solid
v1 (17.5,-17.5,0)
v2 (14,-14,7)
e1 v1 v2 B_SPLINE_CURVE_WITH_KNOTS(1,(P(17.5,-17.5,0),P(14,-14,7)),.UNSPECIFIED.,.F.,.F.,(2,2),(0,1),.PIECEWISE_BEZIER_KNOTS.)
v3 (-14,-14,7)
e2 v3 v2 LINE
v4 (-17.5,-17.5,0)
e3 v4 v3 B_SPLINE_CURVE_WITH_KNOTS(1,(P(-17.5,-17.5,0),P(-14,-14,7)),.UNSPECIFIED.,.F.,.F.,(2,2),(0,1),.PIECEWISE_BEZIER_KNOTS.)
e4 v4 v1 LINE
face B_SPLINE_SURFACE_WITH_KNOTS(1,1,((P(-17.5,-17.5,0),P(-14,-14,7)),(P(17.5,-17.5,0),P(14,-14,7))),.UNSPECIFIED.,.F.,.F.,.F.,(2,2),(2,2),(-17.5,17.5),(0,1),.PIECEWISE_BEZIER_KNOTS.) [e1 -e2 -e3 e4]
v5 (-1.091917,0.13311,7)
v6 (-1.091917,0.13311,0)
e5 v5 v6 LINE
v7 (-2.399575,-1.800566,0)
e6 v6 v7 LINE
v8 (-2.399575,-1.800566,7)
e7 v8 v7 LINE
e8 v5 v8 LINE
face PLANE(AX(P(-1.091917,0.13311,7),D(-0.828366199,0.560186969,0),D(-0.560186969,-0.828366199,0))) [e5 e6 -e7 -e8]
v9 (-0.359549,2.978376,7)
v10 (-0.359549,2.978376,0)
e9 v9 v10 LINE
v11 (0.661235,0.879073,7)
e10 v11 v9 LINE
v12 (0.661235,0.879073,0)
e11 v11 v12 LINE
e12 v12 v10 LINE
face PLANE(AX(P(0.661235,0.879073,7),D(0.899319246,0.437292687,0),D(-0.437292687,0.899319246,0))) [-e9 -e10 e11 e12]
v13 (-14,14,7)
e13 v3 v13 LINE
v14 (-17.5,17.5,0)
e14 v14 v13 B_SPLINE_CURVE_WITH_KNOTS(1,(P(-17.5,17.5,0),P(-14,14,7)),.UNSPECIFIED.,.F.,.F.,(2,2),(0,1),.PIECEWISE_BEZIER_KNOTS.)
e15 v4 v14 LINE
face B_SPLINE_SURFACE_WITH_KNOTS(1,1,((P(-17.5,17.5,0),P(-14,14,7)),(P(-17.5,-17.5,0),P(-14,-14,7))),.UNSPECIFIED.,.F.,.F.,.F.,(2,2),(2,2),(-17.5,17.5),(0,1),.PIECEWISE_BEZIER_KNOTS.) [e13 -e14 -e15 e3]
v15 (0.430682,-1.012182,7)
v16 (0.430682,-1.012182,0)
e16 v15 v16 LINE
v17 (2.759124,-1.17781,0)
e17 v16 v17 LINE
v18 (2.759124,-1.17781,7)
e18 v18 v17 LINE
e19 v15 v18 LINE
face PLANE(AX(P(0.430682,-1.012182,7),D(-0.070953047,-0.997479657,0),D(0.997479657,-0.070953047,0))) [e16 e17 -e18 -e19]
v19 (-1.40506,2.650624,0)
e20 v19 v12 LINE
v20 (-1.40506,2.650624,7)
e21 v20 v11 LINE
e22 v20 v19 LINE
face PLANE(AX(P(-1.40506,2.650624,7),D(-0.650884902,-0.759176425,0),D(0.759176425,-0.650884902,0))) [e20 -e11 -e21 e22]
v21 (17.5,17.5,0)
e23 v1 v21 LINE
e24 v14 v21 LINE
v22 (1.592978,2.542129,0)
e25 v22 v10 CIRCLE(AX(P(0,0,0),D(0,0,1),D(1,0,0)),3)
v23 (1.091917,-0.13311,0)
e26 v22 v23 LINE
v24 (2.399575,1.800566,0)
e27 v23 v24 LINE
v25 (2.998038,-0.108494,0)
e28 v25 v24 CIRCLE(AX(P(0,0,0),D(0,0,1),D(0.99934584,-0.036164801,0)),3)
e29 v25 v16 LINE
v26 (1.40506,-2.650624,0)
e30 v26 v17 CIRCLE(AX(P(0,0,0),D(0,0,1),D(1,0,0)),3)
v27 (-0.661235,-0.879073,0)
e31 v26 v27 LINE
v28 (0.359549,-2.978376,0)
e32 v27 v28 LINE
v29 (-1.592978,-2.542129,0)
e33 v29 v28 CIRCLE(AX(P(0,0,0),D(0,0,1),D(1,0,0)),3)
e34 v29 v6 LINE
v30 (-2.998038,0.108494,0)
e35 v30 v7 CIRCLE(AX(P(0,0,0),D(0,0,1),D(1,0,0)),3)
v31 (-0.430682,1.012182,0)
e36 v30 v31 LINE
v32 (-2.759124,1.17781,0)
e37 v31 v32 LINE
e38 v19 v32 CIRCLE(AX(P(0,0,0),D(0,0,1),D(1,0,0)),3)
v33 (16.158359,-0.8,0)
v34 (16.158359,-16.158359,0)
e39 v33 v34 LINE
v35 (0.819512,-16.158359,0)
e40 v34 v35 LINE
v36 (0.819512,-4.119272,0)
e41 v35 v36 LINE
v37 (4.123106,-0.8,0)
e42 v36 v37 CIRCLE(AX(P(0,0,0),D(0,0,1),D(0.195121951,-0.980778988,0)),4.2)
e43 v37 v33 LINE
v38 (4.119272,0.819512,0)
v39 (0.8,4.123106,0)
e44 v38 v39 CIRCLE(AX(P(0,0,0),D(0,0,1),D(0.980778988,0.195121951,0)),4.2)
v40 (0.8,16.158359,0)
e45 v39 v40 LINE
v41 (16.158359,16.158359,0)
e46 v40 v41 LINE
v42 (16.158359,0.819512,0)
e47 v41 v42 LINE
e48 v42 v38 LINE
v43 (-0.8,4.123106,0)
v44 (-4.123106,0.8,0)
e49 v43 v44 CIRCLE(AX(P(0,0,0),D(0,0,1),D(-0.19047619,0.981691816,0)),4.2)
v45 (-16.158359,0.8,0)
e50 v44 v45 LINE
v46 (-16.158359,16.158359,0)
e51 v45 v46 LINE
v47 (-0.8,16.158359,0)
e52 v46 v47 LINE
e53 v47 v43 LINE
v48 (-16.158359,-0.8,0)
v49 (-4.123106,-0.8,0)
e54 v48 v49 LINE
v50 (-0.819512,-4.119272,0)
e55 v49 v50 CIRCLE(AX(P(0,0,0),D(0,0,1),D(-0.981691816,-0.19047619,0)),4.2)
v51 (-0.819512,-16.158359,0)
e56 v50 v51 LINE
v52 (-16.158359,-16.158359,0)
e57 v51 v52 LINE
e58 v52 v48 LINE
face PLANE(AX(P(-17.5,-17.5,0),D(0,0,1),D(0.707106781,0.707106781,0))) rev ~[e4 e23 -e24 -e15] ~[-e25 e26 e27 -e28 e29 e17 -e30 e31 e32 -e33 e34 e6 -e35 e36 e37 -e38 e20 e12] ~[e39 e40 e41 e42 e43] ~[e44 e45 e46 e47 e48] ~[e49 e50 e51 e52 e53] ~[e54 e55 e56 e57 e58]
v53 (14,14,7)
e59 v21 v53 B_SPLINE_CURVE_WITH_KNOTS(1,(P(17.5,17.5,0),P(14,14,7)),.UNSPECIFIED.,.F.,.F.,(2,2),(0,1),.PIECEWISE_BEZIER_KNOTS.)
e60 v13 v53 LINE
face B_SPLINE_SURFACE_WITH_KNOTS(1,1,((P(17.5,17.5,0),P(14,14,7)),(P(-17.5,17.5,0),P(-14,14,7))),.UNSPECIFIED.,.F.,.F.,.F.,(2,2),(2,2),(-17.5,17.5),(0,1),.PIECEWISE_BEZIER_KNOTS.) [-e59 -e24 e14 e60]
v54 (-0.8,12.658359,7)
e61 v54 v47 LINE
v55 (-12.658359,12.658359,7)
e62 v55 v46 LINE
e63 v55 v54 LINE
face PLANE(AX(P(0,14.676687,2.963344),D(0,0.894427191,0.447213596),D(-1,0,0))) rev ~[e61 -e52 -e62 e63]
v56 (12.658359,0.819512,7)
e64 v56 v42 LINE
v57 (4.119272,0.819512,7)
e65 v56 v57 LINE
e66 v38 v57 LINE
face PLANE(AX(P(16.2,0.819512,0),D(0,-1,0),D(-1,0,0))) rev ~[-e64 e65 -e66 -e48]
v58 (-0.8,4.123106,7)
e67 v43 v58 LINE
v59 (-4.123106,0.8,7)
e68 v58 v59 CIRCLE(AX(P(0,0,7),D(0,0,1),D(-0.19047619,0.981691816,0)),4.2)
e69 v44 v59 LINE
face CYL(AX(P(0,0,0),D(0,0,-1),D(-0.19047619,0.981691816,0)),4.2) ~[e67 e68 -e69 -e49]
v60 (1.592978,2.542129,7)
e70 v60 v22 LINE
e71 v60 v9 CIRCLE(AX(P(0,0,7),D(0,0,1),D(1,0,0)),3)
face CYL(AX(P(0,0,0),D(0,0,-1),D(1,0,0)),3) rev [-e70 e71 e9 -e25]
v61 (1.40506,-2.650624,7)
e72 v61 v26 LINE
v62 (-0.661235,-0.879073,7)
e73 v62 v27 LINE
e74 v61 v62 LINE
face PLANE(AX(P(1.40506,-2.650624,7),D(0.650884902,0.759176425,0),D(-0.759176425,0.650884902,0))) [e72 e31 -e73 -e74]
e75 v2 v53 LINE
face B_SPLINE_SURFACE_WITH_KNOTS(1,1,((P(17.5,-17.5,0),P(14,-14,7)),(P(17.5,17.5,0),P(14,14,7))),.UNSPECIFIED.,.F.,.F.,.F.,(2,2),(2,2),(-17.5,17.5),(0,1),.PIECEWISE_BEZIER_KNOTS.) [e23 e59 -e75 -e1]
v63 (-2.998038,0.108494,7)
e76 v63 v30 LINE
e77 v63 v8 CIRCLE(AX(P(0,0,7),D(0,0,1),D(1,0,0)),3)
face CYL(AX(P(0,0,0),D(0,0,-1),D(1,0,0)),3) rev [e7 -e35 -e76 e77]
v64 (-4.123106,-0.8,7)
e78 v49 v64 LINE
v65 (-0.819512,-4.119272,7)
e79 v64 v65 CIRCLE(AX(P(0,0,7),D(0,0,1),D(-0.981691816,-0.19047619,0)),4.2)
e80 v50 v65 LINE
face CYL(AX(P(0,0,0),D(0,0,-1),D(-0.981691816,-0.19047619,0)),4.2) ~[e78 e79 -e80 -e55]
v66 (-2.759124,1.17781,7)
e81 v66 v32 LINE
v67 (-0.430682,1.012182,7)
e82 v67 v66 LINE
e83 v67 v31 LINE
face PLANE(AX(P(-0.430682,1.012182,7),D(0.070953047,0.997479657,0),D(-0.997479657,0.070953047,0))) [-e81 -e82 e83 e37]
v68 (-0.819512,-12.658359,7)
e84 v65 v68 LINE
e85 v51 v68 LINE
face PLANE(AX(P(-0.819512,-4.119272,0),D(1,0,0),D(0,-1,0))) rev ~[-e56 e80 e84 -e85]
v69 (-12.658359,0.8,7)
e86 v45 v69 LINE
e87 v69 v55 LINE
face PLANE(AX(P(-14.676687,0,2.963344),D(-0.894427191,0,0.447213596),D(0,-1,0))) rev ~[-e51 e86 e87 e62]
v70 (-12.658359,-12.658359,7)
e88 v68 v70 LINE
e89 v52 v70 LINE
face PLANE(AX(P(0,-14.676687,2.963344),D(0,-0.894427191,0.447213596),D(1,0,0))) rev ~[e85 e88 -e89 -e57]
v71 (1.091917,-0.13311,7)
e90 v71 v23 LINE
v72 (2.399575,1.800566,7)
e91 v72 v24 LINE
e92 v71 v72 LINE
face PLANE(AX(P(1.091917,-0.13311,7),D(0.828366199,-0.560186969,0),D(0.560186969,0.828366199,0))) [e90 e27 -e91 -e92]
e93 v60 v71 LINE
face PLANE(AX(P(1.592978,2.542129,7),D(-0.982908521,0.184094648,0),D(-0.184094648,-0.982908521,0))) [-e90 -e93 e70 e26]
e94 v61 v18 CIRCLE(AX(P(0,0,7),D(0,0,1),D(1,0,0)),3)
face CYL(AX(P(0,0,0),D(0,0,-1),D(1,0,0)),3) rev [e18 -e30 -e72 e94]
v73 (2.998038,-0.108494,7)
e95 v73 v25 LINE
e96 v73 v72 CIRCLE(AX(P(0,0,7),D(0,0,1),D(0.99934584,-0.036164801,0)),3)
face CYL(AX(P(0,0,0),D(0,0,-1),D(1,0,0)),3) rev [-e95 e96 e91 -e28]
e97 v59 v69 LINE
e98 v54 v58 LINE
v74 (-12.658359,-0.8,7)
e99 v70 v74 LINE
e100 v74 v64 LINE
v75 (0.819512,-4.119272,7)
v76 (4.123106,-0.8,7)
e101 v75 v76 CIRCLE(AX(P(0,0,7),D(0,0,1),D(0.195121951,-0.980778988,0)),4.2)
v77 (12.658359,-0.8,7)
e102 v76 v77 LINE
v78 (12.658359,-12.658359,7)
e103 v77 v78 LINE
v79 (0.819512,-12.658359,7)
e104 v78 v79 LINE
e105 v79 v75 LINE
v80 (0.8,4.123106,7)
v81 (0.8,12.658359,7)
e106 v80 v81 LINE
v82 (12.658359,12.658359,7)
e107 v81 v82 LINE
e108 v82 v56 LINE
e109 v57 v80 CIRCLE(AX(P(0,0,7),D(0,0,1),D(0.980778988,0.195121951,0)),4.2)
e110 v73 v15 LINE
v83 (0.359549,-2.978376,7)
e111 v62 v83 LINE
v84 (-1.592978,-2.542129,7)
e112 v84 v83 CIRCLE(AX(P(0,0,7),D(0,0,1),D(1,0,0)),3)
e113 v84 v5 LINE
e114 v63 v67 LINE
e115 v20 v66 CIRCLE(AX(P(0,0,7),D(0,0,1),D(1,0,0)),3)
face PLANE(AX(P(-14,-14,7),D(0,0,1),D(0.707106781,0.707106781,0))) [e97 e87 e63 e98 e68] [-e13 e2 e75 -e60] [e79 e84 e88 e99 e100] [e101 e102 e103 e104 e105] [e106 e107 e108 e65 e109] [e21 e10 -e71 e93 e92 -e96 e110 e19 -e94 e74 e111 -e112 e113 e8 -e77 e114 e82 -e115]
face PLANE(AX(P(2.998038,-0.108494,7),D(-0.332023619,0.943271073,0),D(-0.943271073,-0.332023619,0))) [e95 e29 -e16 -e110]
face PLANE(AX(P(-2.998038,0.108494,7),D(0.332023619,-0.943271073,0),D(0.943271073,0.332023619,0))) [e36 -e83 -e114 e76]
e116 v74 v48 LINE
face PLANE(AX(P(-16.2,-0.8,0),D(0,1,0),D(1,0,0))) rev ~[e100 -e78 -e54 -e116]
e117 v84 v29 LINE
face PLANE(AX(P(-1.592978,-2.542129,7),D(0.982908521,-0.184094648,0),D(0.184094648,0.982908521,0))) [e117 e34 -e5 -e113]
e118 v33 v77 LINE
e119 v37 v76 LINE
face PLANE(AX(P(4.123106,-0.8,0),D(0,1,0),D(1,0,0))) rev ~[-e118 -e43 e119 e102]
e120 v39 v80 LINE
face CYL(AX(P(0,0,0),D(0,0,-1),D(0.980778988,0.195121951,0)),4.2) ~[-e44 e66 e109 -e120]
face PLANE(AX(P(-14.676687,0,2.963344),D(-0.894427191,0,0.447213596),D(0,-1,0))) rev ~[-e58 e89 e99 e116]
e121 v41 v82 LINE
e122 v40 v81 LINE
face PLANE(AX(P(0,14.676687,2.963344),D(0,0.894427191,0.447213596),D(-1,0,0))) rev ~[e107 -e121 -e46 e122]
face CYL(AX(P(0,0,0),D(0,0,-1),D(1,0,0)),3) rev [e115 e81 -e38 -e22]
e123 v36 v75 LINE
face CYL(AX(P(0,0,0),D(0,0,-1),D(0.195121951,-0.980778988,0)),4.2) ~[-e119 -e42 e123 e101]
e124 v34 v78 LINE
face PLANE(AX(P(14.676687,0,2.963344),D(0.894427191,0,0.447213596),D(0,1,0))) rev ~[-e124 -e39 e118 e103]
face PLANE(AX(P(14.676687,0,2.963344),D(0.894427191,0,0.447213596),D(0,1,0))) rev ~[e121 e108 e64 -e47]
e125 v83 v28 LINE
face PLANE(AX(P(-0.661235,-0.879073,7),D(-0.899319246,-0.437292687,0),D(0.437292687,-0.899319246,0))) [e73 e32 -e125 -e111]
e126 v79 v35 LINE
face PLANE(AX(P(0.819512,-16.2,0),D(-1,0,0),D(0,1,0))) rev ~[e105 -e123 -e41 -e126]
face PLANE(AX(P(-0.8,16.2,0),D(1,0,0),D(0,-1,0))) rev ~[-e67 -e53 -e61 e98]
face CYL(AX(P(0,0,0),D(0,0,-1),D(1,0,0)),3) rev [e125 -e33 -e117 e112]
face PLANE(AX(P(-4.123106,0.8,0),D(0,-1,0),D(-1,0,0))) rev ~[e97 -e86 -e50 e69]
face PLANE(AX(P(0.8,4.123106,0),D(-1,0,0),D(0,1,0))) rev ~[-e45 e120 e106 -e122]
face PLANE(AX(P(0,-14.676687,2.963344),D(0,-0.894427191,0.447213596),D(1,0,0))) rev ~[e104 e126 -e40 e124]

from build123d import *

# Parameters (mm, degrees)
F0_W       = 35
F0_H       = 35
F2_W       = 28
F2_H       = 28
F4_T       = -1.2
F5_R       = 3
F6_DEPTH   = 7
F7_SIZE2   = 3
F7_SIZE    = 6
F7_2_SIZE2 = 3
F7_2_SIZE  = 6
F7_3_SIZE2 = 3
F7_3_SIZE  = 6
F7_4_SIZE2 = 3
F7_4_SIZE  = 6
F10_DEPTH  = 7


# Not quite as in the source:
# - a feature names something its author has since deleted; it is built from what else it names


with BuildPart() as f3:
    # F0 (on Top) → F3 section 0
    with BuildSketch(Plane.XY):
        Rectangle(F0_W, F0_H)
    # F2 (on offset) → F3 section 1
    with BuildSketch(Plane.XY.offset(7)):
        Rectangle(F2_W, F2_H)
    loft()

    # F4
    f4_openings = [f3.faces().sort_by_distance(p)[0] for p in [
        (0, 0, 7),
        (0, 0, 0),
    ]]
    offset(amount=F4_T, openings=f4_openings)


with BuildPart() as f6:
    # F5 (on Top) → F6 (new body, through all)
    with BuildSketch(Plane.XY):
        with BuildLine():
            Line((-16.2, -0.8), (-4.1231056256, -0.8))
            ThreePointArc((-4.1231056256, -0.8), (-2.9768706674, -2.9628096513), (-0.8195121951, -4.1192717514))
            Line((-0.8195121951, -4.1192717514), (-0.8195121951, -16.2))
            Line((-0.8195121951, -16.2), (0.8195121951, -16.2))
            Line((0.8195121951, -16.2), (0.8195121951, -4.1192717514))
            ThreePointArc((0.8195121951, -4.1192717514), (2.9768706674, -2.9628096513), (4.1231056256, -0.8))
            Line((4.1231056256, -0.8), (16.2, -0.8))
            Line((16.2, -0.8), (16.2, 0.8195121951))
            Line((16.2, 0.8195121951), (4.1192717514, 0.8195121951))
            ThreePointArc((4.1192717514, 0.8195121951), (2.9628096513, 2.9768706674), (0.8, 4.1231056256))
            Line((0.8, 4.1231056256), (0.8, 16.2))
            Line((0.8, 16.2), (-0.8, 16.2))
            Line((-0.8, 16.2), (-0.8, 4.1231056256))
            ThreePointArc((-0.8, 4.1231056256), (-2.969848481, 2.969848481), (-4.1231056256, 0.8))
            Line((-4.1231056256, 0.8), (-16.2, 0.8))
            Line((-16.2, 0.8), (-16.2, -0.8))
        make_face()
        Circle(F5_R, mode=Mode.SUBTRACT)
    extrude(amount=F6_DEPTH)

    # F7
    f7_edges = [f6.edges().sort_by_distance(p)[0] for p in [
        (-16.2, 0, 7),
    ]]
    f7_side = f6.faces().sort_by_distance((-16.2, 0, 3.5))[0]
    chamfer(f7_edges, length=F7_SIZE, length2=F7_SIZE2, reference=f7_side)

    # F7#2
    f7_2_edges = [f6.edges().sort_by_distance(p)[0] for p in [
        (0, 16.2, 7),
    ]]
    f7_2_side = f6.faces().sort_by_distance((0, 16.2, 3.5))[0]
    chamfer(f7_2_edges, length=F7_2_SIZE, length2=F7_2_SIZE2, reference=f7_2_side)

    # F7#3
    f7_3_edges = [f6.edges().sort_by_distance(p)[0] for p in [
        (16.2, 0.009756, 7),
    ]]
    f7_3_side = f6.faces().sort_by_distance((16.2, 0.009756, 3.5))[0]
    chamfer(f7_3_edges, length=F7_3_SIZE, length2=F7_3_SIZE2, reference=f7_3_side)

    # F7#4
    f7_4_edges = [f6.edges().sort_by_distance(p)[0] for p in [
        (0, -16.2, 7),
    ]]
    f7_4_side = f6.faces().sort_by_distance((0, -16.2, 3.5))[0]
    chamfer(f7_4_edges, length=F7_4_SIZE, length2=F7_4_SIZE2, reference=f7_4_side)


with BuildPart() as f3_1:
    add(f3.part)

    # F8: union F6
    add(f6.part)

    # F9 (on face) → F10 (join, through all)
    with BuildSketch(Plane.XY.offset(7)):
        with BuildLine():
            Line((0.6612347815, 0.8790725588), (-0.3595485903, 2.9783762038))
            ThreePointArc((-0.3595485903, 2.9783762038), (-0.8973940811, 2.8626358244), (-1.4050598491, 2.6506238549))
            Line((-1.4050598491, 2.6506238549), (0.6612347815, 0.8790725588))
        make_face()
        with BuildLine():
            Line((-0.430681777, 1.0121823981), (-2.7591237497, 1.1778098887))
            ThreePointArc((-2.7591237497, 1.1778098887), (-2.9278123863, 0.6541518408), (-2.9980375188, 0.1084944043))
            Line((-2.9980375188, 0.1084944043), (-0.430681777, 1.0121823981))
        make_face()
        with BuildLine():
            Line((-1.0919165585, 0.1331098393), (-2.3995751593, -1.800566315))
            ThreePointArc((-2.3995751593, -1.800566315), (-2.0304183052, -2.2084839836), (-1.5929776697, -2.5421294507))
            Line((-1.5929776697, -2.5421294507), (-1.0919165585, 0.1331098393))
        make_face()
        with BuildLine():
            Line((-0.6612347815, -0.8790725588), (0.3595485903, -2.9783762038))
            ThreePointArc((0.3595485903, -2.9783762038), (0.8973940811, -2.8626358244), (1.4050598491, -2.6506238549))
            Line((1.4050598491, -2.6506238549), (-0.6612347815, -0.8790725588))
        make_face()
        with BuildLine():
            ThreePointArc((2.7591237497, -1.1778098887), (2.9278123863, -0.6541518408), (2.9980375188, -0.1084944043))
            Line((2.9980375188, -0.1084944043), (0.430681777, -1.0121823981))
            Line((0.430681777, -1.0121823981), (2.7591237497, -1.1778098887))
        make_face()
        with BuildLine():
            ThreePointArc((2.3995751593, 1.800566315), (2.0304183052, 2.2084839836), (1.5929776697, 2.5421294507))
            Line((1.5929776697, 2.5421294507), (1.0919165585, -0.1331098393))
            Line((1.0919165585, -0.1331098393), (2.3995751593, 1.800566315))
        make_face()
    extrude(amount=-F10_DEPTH)


solid = f3_1.part
